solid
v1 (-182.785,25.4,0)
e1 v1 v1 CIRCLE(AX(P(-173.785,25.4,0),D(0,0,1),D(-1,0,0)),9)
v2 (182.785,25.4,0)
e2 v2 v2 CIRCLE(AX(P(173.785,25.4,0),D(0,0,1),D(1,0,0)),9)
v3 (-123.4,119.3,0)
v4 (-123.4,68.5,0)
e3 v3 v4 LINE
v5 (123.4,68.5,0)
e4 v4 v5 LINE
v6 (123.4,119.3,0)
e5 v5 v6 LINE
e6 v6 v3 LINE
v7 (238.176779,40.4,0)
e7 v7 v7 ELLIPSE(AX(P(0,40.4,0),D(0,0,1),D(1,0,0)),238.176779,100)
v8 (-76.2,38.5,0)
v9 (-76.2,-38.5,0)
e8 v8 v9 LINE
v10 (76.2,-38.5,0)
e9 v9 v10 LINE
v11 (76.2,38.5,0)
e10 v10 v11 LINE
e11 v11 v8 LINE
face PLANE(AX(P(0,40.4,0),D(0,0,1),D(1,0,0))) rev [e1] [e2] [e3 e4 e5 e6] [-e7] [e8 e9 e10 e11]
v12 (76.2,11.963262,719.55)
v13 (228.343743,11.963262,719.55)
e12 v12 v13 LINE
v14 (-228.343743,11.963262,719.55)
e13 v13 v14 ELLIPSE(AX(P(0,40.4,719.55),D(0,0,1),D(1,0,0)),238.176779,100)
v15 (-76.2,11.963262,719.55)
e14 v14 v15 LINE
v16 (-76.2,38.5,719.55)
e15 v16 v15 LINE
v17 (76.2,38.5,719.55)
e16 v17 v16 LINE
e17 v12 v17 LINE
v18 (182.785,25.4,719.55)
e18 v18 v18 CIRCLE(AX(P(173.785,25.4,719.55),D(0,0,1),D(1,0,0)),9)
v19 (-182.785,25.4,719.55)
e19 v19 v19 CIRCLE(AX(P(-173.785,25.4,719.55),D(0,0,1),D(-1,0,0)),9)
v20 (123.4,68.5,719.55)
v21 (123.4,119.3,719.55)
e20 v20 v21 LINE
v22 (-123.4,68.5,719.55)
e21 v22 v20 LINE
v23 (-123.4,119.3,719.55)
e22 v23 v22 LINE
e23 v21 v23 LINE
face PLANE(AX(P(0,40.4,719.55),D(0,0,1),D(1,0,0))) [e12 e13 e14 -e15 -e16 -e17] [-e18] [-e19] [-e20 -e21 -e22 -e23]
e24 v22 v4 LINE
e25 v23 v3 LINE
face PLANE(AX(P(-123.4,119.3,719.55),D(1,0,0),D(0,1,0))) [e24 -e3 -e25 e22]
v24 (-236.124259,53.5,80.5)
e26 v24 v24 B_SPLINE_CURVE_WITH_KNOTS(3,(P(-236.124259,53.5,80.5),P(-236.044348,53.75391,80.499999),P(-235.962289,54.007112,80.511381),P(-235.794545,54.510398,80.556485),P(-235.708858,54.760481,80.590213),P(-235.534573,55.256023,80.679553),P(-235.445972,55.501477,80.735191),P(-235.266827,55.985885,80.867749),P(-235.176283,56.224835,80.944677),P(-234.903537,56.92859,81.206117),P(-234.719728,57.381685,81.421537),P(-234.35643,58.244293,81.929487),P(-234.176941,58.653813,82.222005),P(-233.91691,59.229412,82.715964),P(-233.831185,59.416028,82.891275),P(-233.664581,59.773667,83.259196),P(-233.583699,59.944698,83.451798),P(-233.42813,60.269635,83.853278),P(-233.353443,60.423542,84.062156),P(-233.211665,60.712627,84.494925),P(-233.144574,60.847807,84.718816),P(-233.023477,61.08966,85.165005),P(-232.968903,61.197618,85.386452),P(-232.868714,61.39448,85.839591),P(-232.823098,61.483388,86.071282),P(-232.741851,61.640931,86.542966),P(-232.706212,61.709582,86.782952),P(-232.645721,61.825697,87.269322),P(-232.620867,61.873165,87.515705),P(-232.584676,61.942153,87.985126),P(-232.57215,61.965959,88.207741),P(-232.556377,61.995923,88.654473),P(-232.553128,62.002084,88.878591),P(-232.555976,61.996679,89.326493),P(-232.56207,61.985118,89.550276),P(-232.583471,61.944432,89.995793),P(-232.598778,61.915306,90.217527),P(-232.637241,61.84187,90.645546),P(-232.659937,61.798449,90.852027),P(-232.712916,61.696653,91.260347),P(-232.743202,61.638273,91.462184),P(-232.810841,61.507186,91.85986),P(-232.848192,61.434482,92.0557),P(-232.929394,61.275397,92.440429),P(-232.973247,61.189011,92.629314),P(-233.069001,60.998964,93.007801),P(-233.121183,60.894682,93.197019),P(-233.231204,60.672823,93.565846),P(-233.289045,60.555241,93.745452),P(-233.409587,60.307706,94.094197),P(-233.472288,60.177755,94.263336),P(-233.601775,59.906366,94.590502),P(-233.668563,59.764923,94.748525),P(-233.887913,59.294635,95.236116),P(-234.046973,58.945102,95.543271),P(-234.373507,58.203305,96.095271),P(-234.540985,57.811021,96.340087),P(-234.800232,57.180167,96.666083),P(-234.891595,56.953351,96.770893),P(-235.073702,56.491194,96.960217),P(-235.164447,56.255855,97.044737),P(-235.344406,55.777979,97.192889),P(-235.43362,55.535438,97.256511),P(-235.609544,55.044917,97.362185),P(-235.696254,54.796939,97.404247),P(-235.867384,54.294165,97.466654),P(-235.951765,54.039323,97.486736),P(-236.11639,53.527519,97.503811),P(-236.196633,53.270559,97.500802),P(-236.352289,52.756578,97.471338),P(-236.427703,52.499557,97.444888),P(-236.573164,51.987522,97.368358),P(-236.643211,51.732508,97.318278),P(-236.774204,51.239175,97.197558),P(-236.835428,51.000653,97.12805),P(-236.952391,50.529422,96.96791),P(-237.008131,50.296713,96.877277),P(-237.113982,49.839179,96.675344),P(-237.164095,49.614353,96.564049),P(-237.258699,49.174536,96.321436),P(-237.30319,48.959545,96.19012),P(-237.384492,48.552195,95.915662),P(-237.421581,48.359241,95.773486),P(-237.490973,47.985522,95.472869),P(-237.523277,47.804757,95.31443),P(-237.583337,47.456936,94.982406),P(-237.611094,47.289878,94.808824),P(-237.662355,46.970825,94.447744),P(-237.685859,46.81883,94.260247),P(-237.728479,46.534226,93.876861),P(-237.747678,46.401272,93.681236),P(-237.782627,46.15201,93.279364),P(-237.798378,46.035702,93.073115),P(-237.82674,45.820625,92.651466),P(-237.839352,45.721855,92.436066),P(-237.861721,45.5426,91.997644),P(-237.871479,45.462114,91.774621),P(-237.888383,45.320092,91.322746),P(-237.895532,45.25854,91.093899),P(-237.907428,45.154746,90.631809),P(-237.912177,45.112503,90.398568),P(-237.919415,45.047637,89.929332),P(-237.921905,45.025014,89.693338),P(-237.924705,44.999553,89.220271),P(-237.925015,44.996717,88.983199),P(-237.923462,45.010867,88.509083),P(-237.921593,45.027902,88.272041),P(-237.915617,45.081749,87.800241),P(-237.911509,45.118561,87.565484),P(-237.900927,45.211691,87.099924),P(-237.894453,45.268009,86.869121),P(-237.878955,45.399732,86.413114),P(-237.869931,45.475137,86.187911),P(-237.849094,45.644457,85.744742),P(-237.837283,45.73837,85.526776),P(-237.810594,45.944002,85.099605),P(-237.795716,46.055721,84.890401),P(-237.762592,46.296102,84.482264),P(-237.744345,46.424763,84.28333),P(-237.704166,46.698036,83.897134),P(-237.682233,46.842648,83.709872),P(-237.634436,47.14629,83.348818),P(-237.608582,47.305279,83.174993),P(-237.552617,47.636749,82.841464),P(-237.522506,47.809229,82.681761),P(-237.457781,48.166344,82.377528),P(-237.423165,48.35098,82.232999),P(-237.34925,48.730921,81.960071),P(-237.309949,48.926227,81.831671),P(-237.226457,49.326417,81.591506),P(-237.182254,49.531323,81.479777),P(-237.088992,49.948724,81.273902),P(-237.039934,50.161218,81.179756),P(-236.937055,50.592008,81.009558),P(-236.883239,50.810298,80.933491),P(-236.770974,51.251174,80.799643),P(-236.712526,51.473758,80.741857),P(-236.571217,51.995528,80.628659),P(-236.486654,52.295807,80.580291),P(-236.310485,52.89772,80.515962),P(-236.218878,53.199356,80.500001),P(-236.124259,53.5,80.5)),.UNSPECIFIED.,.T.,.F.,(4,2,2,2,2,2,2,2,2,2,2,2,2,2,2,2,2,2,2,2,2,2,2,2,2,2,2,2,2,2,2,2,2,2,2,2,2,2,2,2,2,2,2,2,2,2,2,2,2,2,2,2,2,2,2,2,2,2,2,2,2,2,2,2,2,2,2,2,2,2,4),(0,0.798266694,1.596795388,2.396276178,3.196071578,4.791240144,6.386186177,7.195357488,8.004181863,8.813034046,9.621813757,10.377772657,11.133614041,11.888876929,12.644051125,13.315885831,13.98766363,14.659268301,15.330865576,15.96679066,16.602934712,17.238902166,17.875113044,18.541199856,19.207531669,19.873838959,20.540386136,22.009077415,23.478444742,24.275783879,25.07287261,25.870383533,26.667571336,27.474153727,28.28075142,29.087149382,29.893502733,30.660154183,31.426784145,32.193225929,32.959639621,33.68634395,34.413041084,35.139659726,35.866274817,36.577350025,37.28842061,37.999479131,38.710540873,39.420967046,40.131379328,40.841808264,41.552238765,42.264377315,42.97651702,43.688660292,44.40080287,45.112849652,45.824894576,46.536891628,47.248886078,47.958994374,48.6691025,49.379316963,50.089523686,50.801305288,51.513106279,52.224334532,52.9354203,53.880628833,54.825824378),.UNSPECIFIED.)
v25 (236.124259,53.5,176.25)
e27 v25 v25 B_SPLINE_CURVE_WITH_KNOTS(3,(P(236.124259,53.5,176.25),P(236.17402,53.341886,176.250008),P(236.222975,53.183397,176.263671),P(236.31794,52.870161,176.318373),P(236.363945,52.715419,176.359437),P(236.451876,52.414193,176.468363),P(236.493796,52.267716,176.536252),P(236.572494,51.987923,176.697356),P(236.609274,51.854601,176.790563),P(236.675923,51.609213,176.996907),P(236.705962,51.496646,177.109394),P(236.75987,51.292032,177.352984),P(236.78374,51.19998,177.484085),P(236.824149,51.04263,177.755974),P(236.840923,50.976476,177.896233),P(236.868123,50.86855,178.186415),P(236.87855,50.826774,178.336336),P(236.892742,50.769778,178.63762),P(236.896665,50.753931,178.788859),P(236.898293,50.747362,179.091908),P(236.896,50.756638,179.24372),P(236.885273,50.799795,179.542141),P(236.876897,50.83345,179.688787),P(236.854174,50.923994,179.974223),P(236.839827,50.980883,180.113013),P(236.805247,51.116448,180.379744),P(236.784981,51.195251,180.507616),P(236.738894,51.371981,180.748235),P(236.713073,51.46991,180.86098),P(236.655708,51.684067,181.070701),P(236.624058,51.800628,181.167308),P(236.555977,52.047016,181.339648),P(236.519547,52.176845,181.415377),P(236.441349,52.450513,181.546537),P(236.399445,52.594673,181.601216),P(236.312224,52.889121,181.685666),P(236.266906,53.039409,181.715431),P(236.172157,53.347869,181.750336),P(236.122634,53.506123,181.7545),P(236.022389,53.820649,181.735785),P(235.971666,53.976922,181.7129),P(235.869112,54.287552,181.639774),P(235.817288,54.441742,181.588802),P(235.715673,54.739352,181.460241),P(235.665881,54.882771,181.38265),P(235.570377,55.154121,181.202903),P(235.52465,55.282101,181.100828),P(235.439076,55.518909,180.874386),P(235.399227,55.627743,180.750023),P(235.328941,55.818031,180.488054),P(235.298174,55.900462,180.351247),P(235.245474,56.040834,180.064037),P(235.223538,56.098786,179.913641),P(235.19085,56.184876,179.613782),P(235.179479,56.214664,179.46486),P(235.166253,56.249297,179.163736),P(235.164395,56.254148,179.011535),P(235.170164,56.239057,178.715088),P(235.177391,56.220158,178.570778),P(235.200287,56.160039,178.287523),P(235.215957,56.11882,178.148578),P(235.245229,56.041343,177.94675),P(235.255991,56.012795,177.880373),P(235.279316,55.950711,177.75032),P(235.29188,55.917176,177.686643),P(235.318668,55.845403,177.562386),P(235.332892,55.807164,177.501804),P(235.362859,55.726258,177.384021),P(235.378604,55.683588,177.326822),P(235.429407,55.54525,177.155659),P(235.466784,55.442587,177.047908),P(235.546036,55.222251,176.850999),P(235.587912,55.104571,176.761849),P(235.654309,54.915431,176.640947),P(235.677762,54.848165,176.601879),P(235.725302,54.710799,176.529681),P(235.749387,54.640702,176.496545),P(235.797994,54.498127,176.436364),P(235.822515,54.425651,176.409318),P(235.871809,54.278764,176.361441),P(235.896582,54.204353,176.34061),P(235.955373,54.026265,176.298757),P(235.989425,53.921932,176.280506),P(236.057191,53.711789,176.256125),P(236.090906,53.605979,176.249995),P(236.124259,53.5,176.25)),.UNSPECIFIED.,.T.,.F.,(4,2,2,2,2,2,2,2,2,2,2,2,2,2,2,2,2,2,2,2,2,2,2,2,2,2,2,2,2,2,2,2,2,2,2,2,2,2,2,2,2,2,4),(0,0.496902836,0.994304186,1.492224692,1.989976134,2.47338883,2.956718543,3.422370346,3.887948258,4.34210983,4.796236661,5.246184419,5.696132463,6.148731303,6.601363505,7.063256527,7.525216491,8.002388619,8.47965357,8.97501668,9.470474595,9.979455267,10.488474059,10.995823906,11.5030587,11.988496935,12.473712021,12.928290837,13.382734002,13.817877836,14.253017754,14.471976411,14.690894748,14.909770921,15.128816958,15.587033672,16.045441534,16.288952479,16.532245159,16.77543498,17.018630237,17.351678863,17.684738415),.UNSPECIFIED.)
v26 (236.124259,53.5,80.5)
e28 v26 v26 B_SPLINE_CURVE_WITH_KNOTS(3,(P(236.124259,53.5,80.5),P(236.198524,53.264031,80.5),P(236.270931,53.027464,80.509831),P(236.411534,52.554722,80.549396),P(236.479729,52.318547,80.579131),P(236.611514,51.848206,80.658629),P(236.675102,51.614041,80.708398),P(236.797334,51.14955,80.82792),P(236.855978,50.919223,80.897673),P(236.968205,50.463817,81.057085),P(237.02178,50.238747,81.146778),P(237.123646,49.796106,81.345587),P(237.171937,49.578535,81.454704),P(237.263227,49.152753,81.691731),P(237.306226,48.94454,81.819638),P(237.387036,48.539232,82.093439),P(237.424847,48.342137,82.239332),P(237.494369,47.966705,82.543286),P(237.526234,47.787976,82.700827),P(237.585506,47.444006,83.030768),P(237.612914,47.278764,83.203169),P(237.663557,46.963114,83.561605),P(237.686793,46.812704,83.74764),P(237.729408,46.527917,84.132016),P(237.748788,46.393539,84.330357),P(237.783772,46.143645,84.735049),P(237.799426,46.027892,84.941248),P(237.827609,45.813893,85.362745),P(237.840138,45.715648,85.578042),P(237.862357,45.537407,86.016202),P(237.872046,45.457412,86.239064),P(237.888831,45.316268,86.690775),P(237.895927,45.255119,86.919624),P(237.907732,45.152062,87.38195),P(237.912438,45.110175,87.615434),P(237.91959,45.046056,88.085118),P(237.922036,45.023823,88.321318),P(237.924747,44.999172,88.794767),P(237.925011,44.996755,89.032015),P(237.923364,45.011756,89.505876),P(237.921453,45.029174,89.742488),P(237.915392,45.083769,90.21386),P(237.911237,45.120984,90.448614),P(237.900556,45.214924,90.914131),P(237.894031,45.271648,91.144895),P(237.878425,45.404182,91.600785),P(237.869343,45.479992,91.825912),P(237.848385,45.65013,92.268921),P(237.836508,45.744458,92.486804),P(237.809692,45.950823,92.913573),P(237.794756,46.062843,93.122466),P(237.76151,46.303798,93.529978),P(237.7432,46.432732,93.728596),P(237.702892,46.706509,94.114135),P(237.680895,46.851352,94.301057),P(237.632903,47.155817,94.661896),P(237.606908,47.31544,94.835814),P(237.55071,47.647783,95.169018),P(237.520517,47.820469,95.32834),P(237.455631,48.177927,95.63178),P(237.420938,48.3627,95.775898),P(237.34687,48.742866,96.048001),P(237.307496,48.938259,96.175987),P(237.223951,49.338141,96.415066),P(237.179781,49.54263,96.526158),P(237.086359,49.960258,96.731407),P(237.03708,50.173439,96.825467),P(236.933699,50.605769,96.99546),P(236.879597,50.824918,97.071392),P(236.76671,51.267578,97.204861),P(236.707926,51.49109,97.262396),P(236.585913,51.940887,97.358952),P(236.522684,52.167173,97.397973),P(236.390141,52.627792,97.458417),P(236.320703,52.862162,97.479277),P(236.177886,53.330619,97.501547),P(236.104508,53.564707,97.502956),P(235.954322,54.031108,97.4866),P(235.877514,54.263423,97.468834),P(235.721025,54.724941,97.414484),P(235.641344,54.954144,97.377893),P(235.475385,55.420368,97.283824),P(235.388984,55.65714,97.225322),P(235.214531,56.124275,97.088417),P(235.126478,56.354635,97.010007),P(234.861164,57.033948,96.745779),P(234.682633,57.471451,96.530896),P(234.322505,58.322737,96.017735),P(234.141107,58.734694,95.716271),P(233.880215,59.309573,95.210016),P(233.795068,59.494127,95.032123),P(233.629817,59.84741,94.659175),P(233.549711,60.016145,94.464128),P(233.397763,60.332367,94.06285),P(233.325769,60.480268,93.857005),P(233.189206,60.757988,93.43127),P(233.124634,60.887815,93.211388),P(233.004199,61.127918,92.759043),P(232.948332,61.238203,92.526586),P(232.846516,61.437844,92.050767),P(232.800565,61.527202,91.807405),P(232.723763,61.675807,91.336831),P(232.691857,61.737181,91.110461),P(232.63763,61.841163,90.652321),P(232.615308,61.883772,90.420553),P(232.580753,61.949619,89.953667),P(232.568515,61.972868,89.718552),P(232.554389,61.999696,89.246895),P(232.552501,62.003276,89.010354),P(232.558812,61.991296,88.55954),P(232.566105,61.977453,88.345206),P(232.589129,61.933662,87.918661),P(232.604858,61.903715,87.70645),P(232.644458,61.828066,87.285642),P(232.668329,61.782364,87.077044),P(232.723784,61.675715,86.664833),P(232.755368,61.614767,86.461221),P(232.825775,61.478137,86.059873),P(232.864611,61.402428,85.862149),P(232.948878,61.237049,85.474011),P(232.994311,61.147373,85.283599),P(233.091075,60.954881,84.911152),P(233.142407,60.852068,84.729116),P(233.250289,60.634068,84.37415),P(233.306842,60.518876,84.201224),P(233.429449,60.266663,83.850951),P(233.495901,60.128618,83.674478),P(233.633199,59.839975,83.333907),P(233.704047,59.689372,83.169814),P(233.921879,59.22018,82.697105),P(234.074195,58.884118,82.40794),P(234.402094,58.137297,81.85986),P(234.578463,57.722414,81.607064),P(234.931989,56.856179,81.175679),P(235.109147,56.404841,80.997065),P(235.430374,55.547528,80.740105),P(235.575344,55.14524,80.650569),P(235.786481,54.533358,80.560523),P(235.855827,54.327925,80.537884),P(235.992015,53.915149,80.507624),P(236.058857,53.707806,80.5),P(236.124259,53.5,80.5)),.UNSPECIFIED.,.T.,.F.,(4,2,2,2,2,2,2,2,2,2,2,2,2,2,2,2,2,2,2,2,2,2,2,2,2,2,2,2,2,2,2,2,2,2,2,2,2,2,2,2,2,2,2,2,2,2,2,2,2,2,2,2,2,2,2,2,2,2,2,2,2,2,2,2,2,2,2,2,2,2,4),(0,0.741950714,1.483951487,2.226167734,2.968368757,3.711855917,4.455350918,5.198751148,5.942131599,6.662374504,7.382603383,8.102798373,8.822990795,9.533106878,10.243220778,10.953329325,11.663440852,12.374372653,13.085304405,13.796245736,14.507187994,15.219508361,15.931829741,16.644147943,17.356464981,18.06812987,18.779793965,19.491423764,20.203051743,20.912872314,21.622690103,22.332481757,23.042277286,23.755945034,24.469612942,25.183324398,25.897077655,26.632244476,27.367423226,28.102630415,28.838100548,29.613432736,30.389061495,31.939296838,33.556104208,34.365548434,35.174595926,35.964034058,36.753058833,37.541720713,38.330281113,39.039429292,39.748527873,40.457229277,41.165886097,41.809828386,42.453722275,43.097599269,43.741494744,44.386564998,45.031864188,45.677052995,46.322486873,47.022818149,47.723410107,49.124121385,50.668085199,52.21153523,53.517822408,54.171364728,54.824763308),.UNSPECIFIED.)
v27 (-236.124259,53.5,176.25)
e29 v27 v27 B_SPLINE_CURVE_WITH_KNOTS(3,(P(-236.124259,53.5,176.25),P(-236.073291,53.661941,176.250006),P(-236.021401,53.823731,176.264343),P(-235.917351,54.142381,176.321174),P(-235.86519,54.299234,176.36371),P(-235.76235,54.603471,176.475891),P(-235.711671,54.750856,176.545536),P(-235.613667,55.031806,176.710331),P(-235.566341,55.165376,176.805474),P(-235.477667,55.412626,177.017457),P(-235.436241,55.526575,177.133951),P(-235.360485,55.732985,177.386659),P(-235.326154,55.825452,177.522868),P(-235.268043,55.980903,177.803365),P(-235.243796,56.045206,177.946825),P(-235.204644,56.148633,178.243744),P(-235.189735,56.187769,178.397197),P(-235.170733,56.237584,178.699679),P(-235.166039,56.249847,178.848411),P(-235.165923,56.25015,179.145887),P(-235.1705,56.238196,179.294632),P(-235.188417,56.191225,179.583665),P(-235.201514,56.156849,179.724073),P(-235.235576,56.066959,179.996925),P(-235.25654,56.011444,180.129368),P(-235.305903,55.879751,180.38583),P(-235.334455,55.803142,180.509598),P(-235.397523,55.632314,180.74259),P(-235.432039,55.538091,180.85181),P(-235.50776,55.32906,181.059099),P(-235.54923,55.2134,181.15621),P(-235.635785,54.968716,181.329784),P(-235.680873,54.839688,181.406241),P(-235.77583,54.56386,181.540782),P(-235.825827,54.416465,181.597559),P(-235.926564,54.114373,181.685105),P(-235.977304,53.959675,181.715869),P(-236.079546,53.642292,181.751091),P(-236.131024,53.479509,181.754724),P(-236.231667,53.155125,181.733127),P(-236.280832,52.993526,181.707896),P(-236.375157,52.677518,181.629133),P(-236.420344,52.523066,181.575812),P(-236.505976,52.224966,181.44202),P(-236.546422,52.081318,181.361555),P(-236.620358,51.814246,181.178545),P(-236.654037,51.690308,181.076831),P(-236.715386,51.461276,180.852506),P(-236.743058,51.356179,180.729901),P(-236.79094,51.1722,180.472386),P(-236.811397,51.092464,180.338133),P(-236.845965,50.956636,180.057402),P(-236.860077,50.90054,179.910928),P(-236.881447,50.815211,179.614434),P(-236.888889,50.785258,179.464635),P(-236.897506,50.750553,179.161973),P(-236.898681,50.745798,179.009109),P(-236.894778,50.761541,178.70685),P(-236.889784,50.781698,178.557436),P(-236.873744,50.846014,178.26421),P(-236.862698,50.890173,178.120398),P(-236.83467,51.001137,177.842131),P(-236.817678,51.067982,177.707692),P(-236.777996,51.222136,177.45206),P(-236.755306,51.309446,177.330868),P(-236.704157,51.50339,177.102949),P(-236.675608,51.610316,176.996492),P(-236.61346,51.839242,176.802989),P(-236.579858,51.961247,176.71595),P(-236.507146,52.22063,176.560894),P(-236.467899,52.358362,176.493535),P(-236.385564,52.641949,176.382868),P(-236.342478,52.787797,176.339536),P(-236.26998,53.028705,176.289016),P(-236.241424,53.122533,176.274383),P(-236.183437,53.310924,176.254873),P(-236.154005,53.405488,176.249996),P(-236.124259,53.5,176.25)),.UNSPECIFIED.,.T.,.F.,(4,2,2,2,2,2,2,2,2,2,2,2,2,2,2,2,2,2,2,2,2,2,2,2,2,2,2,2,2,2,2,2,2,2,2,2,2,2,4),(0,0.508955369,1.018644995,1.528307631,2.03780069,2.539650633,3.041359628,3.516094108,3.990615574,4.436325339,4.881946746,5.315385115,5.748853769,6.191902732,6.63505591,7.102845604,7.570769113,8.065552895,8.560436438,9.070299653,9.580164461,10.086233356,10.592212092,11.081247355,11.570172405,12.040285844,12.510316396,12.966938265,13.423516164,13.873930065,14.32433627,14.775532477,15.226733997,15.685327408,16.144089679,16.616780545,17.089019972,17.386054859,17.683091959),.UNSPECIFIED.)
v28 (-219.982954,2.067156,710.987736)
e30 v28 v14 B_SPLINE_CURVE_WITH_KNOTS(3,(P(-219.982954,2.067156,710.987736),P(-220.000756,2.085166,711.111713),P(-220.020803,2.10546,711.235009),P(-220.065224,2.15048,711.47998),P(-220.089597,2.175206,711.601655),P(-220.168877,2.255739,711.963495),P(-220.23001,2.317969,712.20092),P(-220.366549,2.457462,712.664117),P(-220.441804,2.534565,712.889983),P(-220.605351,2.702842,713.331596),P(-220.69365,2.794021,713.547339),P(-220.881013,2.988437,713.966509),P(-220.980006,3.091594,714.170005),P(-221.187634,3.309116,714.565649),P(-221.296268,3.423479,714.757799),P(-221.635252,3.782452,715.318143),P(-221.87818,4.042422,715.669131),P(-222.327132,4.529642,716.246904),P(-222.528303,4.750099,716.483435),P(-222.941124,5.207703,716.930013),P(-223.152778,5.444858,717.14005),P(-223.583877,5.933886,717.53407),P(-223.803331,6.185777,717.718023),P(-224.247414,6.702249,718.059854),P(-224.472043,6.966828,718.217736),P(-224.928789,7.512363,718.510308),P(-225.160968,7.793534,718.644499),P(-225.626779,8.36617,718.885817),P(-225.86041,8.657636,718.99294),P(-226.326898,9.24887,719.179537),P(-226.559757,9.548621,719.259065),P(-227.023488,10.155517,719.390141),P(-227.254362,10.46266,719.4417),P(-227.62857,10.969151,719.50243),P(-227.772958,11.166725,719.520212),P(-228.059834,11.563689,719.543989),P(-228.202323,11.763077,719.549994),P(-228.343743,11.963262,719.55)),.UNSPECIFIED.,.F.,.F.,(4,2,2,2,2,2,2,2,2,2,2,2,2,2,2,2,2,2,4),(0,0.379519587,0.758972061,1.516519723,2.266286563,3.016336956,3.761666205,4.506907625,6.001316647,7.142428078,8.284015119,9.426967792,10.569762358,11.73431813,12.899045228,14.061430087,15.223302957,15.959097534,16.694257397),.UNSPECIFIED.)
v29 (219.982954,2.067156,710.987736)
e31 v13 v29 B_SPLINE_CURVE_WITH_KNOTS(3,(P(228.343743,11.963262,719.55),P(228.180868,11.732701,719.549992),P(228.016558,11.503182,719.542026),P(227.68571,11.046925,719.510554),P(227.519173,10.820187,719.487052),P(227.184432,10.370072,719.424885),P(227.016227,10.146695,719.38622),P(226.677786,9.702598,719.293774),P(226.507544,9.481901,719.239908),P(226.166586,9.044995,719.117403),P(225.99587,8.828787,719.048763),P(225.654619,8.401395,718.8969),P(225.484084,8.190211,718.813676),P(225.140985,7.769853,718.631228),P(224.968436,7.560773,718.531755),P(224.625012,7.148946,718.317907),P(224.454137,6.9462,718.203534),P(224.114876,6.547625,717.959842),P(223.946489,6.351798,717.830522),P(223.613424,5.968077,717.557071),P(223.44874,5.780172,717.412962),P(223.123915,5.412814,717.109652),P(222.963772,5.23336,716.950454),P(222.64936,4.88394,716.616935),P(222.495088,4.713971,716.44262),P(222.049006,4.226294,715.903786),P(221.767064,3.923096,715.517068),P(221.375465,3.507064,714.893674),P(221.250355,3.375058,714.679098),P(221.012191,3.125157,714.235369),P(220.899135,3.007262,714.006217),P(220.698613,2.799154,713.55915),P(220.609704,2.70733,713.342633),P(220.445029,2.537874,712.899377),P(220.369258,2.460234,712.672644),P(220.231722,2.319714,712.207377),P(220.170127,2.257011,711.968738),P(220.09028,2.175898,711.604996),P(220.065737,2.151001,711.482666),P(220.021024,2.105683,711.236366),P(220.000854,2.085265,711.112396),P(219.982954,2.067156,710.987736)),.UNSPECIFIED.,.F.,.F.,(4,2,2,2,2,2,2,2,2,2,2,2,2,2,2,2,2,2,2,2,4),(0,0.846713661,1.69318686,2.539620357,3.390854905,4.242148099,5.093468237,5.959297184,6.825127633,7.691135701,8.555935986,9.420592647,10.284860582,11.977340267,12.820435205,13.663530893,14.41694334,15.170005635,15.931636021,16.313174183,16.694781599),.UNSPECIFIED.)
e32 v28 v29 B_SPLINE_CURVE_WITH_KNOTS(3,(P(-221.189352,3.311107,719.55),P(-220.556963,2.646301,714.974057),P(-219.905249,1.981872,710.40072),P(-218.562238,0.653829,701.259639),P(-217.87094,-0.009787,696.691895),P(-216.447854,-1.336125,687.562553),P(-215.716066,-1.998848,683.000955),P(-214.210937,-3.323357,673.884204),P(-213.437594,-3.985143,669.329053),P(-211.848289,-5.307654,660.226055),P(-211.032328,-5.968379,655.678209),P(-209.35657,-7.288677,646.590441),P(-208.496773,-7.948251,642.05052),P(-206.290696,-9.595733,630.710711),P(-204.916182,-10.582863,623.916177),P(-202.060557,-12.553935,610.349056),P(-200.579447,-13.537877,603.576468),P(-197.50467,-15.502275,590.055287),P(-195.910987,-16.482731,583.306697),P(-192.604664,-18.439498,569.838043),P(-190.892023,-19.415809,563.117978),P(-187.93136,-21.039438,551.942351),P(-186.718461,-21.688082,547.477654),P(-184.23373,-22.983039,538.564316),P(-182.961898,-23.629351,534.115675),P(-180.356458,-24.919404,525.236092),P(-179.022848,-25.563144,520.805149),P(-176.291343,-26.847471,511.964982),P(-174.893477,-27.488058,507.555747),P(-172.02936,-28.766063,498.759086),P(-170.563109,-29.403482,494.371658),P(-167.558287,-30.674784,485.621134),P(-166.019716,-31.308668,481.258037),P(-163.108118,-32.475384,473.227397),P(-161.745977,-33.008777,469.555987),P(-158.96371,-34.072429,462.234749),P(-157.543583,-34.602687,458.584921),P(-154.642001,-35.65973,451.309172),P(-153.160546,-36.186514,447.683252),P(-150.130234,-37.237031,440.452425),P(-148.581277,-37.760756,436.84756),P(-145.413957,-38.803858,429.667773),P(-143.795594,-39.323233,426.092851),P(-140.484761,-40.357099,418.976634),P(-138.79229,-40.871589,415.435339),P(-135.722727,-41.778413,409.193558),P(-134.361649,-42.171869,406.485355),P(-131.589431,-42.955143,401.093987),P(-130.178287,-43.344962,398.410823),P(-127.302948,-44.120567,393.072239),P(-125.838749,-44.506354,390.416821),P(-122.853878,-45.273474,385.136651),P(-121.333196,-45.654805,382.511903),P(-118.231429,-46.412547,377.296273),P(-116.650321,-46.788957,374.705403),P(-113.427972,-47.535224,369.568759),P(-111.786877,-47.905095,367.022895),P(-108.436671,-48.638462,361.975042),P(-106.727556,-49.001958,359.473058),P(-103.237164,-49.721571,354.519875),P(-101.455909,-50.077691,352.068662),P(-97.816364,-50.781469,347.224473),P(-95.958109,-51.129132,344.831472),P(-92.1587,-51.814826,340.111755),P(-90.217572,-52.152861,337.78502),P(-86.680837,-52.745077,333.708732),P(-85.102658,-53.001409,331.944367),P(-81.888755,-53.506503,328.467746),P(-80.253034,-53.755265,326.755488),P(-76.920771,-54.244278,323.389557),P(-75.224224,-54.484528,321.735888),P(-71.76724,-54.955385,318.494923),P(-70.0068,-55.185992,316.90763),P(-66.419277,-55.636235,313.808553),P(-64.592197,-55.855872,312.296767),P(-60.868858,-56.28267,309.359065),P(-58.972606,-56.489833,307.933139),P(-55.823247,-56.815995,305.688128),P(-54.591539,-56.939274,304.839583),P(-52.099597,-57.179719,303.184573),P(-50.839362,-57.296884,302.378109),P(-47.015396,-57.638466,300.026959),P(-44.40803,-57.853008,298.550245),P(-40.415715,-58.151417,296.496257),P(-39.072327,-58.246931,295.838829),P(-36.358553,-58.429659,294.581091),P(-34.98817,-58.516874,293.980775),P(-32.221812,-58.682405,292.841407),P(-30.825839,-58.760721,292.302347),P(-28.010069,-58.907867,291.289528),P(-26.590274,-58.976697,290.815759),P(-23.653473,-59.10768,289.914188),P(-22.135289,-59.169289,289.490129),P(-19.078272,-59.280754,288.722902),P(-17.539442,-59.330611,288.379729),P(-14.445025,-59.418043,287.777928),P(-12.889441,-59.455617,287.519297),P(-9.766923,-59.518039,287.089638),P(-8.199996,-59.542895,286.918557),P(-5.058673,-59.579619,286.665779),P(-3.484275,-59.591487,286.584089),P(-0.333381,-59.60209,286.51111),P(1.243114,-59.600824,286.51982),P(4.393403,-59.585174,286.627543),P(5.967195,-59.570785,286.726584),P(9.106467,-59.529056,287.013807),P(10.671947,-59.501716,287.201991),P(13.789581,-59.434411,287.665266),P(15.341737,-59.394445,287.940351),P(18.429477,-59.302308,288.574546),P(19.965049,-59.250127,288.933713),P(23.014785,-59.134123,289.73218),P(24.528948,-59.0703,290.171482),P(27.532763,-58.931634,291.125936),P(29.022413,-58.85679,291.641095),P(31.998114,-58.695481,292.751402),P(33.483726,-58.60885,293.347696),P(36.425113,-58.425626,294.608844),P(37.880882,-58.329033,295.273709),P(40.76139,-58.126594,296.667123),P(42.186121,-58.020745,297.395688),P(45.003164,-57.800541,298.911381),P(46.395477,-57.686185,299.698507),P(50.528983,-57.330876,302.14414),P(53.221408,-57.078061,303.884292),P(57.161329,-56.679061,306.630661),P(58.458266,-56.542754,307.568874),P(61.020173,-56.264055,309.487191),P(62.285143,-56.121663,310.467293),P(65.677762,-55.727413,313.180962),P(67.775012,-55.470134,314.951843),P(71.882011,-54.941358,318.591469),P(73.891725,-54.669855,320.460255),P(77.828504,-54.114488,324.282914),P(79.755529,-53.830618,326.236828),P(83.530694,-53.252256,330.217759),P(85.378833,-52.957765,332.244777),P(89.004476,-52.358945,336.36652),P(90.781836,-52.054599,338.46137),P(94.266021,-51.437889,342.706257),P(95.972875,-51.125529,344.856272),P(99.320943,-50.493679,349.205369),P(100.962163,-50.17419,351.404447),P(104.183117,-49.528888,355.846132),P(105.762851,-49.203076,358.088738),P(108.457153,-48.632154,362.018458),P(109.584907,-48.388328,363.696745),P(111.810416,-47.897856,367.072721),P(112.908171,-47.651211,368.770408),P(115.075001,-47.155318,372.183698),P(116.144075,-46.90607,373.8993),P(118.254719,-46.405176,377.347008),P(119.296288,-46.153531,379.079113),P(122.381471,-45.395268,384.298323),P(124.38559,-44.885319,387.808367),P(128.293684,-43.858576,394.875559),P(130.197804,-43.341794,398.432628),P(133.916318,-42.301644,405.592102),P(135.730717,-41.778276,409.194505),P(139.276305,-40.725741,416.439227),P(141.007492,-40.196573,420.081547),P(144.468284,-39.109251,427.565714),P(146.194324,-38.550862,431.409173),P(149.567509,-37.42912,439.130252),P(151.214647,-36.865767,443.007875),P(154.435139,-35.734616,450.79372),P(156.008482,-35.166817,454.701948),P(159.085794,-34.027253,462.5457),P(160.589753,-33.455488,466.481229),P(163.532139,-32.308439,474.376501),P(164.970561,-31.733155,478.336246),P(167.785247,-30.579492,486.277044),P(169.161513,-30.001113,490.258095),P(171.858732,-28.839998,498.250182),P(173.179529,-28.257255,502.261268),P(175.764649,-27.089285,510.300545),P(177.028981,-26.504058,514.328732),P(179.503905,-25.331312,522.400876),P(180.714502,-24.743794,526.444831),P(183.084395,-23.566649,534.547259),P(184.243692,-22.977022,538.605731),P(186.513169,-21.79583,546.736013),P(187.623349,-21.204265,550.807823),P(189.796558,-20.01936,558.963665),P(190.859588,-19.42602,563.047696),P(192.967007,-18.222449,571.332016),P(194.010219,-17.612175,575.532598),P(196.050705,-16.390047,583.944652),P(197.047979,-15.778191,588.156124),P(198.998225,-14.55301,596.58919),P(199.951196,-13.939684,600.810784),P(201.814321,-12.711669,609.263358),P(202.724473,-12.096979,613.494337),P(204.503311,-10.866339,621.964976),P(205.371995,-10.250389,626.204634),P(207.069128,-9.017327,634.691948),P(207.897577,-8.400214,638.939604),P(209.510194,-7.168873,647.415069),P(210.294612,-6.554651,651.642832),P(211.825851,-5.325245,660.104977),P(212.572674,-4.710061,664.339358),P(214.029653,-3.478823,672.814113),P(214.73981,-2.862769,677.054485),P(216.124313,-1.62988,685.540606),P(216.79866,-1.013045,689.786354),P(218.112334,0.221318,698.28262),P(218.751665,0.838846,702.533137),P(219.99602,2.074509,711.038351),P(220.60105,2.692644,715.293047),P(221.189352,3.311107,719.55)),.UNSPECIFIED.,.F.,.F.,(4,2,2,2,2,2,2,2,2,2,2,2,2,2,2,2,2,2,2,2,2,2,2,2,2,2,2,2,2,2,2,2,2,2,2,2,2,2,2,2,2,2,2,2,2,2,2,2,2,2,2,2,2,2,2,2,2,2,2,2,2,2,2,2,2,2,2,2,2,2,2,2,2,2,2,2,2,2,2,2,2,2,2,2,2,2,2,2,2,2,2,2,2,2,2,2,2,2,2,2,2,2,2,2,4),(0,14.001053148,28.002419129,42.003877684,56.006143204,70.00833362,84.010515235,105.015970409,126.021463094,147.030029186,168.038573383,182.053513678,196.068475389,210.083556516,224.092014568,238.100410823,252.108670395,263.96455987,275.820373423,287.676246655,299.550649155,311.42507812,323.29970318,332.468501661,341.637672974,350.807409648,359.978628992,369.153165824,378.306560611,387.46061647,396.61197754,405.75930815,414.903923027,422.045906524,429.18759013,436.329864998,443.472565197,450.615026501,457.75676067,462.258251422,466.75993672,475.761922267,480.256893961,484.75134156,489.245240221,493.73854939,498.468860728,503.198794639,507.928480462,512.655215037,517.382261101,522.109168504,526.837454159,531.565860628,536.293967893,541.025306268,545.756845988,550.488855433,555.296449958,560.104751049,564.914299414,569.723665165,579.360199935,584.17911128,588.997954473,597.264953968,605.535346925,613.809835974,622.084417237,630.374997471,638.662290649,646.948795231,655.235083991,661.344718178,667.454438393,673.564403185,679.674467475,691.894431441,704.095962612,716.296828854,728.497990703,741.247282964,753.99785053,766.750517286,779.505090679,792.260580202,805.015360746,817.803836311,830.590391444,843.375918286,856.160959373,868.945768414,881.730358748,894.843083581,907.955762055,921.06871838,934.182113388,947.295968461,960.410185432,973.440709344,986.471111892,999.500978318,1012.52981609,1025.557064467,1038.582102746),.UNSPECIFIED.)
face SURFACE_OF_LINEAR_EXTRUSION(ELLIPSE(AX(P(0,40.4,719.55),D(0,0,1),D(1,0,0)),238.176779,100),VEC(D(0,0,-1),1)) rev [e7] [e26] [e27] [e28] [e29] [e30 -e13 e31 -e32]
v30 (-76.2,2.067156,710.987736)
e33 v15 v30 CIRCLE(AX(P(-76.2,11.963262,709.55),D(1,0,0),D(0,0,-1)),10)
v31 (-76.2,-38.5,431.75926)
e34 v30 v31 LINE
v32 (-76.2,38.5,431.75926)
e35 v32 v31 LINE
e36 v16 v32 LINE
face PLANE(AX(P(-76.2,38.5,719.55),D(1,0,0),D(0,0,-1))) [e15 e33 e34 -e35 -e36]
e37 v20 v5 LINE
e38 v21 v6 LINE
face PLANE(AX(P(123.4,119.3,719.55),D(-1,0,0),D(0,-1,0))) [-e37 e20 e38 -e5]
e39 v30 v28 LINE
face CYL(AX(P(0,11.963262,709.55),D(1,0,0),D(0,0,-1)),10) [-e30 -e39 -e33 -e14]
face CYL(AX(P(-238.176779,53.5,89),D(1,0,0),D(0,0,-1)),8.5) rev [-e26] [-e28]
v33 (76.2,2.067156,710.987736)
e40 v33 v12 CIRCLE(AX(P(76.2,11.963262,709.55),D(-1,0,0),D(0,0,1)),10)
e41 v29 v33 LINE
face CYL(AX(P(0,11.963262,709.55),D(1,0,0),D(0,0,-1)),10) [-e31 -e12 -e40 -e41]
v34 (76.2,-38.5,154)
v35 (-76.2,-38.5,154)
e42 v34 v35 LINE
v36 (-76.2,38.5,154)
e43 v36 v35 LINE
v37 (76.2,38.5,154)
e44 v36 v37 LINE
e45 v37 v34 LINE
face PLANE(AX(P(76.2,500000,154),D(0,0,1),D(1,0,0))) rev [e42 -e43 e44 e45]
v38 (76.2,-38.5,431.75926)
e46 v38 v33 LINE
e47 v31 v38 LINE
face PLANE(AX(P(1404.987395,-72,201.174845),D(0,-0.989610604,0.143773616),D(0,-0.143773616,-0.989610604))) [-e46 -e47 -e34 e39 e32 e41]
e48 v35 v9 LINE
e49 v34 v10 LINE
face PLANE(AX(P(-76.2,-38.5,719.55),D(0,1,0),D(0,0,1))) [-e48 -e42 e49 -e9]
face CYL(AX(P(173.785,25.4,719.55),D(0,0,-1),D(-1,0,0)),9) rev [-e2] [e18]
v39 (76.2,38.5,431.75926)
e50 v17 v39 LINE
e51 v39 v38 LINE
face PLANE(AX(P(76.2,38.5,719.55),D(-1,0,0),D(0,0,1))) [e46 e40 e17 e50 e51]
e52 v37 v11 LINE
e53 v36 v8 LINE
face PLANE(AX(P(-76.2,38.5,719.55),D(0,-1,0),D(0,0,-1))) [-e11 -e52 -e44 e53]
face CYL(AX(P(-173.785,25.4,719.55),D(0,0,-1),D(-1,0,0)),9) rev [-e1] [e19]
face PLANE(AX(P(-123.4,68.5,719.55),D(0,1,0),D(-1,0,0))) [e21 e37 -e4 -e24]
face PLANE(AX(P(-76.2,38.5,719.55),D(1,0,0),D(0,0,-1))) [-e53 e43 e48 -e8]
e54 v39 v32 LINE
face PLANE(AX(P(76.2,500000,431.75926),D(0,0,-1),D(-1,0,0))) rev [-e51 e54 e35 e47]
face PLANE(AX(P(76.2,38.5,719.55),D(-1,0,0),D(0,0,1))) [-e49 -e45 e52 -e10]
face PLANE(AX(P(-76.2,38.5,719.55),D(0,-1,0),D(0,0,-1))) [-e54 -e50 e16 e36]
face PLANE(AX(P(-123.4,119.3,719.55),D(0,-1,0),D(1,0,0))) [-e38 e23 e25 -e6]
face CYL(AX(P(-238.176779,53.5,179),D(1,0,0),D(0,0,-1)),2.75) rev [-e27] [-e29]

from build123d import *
from OCP.BRepAlgoAPI import BRepAlgoAPI_Cut
from OCP.TopTools import TopTools_ListOfShape

# Parameters (mm, degrees)
SKETCH1_RX              = 238.176778745998
SKETCH1_RY              = 100
SKETCH1_R               = 9.000000000000009
SKETCH1_W               = 152.4
SKETCH1_H               = 77
BOSS_EXTRUDE1_DEPTH     = 719.5500000000001
CUT_EXTRUDE1_DEPTH      = 771.8388550363948
CUT_EXTRUDE1_DEPTH_BACK = 771.8388550363948
FILLET1_R               = 9.999999999999996
BOSS_EXTRUDE2_REACH     = 780.772
SKETCH4_W               = 152.4
SKETCH4_H               = 277.7592603894774
CUT_EXTRUDE2_DEPTH      = 771.8388551788538
CUT_EXTRUDE2_DEPTH_BACK = 771.8388551788538
SKETCH5_R               = 2.7500000000000084
SKETCH5_R_2             = 8.50000000000001


with BuildPart() as part:
    # Sketch1 → Boss-Extrude1 (new body)
    with BuildSketch(Plane.XY):
        with Locations(Location((0, 40.399999999999984), (0, 0, 6.84e-15))):
            Ellipse(SKETCH1_RX, SKETCH1_RY)
        with Locations((173.785, 25.400000000000006)):
            Circle(SKETCH1_R, mode=Mode.SUBTRACT)
        with Locations((-173.785, 25.400000000000006)):
            Circle(SKETCH1_R, mode=Mode.SUBTRACT)
        Polygon((-123.39999999999999, 119.29999999999997), (123.39999999999999, 119.3), (123.4, 68.5), (-123.4, 68.49999999999997), align=None, mode=Mode.SUBTRACT)
        Rectangle(SKETCH1_W, SKETCH1_H, mode=Mode.SUBTRACT)
    extrude(amount=BOSS_EXTRUDE1_DEPTH)

    # Sketch3 → Cut-Extrude1 (cut, two sides: drawn at the far end of the back side and taken through both)
    with BuildSketch(Plane(origin=(0, 0, 0), x_dir=(0, 0, -1), z_dir=(1, 0, 0)).offset(-CUT_EXTRUDE1_DEPTH_BACK)):
        Polygon((1280.4819340937215, -287.25956976454023), (-201.17484480506153, -72.00000000000001), (-731.1748448050615, 4.999999999999994), (-2212.831623703845, 220.2595697645402), (-2643.350763232925, -2743.053988033026), (849.9627945646412, -3250.5731275621065), align=None)
    extrude(amount=CUT_EXTRUDE1_DEPTH + CUT_EXTRUDE1_DEPTH_BACK, mode=Mode.SUBTRACT)

    # Fillet1
    fillet1_edges = [part.edges().sort_by_distance(p)[0] for p in [
        (148.69467604524613, 3.311107452849548, 719.5500000000004),
        (-148.69467604524613, 3.311107452849548, 719.5500000000004),
    ]]
    fillet(fillet1_edges, radius=FILLET1_R)

    # Sketch4 → Boss-Extrude2 (add, up to next)
    with BuildSketch(Plane(origin=(0, -38.5, 0), x_dir=(1, 0, 0), z_dir=(0, 1, 0)), mode=Mode.PRIVATE) as boss_extrude2_sk1:
        with Locations((0, -292.8796301947387)):
            Rectangle(SKETCH4_W, SKETCH4_H)
    boss_extrude2_tool1 = extrude(boss_extrude2_sk1.sketch, amount=BOSS_EXTRUDE2_REACH, mode=Mode.PRIVATE) - part.part
    add(boss_extrude2_tool1.solids().sort_by_distance((0, -38.5, 292.87963))[0])


with BuildPart() as cut_extrude2_tool:
    # Sketch5 → Cut-Extrude2 (new, two sides: drawn at the far end of the back side and taken through both)
    with BuildSketch(Plane(origin=(0, 0, 0), x_dir=(0, 0, -1), z_dir=(1, 0, 0)).offset(-CUT_EXTRUDE2_DEPTH_BACK)):
        with Locations((-179.00000000000003, 53.5)):
            Circle(SKETCH5_R)
        with Locations((-89.00000000000003, 53.5)):
            Circle(SKETCH5_R_2)
    extrude(amount=CUT_EXTRUDE2_DEPTH + CUT_EXTRUDE2_DEPTH_BACK)


with BuildPart() as part_1:
    add(part.part)

    # Cut-Extrude2: cut by cut_extrude2_tool, with a tolerance
    cut_extrude2_stock = TopTools_ListOfShape()
    cut_extrude2_stock.Append(part_1.part.wrapped)
    cut_extrude2_tools = TopTools_ListOfShape()
    cut_extrude2_tools.Append(cut_extrude2_tool.part.wrapped)
    cut_extrude2_cut = BRepAlgoAPI_Cut()
    cut_extrude2_cut.SetArguments(cut_extrude2_stock)
    cut_extrude2_cut.SetTools(cut_extrude2_tools)
    cut_extrude2_cut.SetFuzzyValue(0.00001)
    cut_extrude2_cut.Build()
    add(Compound.cast(cut_extrude2_cut.Shape()).solids(), mode=Mode.REPLACE)


solid = part_1.part
